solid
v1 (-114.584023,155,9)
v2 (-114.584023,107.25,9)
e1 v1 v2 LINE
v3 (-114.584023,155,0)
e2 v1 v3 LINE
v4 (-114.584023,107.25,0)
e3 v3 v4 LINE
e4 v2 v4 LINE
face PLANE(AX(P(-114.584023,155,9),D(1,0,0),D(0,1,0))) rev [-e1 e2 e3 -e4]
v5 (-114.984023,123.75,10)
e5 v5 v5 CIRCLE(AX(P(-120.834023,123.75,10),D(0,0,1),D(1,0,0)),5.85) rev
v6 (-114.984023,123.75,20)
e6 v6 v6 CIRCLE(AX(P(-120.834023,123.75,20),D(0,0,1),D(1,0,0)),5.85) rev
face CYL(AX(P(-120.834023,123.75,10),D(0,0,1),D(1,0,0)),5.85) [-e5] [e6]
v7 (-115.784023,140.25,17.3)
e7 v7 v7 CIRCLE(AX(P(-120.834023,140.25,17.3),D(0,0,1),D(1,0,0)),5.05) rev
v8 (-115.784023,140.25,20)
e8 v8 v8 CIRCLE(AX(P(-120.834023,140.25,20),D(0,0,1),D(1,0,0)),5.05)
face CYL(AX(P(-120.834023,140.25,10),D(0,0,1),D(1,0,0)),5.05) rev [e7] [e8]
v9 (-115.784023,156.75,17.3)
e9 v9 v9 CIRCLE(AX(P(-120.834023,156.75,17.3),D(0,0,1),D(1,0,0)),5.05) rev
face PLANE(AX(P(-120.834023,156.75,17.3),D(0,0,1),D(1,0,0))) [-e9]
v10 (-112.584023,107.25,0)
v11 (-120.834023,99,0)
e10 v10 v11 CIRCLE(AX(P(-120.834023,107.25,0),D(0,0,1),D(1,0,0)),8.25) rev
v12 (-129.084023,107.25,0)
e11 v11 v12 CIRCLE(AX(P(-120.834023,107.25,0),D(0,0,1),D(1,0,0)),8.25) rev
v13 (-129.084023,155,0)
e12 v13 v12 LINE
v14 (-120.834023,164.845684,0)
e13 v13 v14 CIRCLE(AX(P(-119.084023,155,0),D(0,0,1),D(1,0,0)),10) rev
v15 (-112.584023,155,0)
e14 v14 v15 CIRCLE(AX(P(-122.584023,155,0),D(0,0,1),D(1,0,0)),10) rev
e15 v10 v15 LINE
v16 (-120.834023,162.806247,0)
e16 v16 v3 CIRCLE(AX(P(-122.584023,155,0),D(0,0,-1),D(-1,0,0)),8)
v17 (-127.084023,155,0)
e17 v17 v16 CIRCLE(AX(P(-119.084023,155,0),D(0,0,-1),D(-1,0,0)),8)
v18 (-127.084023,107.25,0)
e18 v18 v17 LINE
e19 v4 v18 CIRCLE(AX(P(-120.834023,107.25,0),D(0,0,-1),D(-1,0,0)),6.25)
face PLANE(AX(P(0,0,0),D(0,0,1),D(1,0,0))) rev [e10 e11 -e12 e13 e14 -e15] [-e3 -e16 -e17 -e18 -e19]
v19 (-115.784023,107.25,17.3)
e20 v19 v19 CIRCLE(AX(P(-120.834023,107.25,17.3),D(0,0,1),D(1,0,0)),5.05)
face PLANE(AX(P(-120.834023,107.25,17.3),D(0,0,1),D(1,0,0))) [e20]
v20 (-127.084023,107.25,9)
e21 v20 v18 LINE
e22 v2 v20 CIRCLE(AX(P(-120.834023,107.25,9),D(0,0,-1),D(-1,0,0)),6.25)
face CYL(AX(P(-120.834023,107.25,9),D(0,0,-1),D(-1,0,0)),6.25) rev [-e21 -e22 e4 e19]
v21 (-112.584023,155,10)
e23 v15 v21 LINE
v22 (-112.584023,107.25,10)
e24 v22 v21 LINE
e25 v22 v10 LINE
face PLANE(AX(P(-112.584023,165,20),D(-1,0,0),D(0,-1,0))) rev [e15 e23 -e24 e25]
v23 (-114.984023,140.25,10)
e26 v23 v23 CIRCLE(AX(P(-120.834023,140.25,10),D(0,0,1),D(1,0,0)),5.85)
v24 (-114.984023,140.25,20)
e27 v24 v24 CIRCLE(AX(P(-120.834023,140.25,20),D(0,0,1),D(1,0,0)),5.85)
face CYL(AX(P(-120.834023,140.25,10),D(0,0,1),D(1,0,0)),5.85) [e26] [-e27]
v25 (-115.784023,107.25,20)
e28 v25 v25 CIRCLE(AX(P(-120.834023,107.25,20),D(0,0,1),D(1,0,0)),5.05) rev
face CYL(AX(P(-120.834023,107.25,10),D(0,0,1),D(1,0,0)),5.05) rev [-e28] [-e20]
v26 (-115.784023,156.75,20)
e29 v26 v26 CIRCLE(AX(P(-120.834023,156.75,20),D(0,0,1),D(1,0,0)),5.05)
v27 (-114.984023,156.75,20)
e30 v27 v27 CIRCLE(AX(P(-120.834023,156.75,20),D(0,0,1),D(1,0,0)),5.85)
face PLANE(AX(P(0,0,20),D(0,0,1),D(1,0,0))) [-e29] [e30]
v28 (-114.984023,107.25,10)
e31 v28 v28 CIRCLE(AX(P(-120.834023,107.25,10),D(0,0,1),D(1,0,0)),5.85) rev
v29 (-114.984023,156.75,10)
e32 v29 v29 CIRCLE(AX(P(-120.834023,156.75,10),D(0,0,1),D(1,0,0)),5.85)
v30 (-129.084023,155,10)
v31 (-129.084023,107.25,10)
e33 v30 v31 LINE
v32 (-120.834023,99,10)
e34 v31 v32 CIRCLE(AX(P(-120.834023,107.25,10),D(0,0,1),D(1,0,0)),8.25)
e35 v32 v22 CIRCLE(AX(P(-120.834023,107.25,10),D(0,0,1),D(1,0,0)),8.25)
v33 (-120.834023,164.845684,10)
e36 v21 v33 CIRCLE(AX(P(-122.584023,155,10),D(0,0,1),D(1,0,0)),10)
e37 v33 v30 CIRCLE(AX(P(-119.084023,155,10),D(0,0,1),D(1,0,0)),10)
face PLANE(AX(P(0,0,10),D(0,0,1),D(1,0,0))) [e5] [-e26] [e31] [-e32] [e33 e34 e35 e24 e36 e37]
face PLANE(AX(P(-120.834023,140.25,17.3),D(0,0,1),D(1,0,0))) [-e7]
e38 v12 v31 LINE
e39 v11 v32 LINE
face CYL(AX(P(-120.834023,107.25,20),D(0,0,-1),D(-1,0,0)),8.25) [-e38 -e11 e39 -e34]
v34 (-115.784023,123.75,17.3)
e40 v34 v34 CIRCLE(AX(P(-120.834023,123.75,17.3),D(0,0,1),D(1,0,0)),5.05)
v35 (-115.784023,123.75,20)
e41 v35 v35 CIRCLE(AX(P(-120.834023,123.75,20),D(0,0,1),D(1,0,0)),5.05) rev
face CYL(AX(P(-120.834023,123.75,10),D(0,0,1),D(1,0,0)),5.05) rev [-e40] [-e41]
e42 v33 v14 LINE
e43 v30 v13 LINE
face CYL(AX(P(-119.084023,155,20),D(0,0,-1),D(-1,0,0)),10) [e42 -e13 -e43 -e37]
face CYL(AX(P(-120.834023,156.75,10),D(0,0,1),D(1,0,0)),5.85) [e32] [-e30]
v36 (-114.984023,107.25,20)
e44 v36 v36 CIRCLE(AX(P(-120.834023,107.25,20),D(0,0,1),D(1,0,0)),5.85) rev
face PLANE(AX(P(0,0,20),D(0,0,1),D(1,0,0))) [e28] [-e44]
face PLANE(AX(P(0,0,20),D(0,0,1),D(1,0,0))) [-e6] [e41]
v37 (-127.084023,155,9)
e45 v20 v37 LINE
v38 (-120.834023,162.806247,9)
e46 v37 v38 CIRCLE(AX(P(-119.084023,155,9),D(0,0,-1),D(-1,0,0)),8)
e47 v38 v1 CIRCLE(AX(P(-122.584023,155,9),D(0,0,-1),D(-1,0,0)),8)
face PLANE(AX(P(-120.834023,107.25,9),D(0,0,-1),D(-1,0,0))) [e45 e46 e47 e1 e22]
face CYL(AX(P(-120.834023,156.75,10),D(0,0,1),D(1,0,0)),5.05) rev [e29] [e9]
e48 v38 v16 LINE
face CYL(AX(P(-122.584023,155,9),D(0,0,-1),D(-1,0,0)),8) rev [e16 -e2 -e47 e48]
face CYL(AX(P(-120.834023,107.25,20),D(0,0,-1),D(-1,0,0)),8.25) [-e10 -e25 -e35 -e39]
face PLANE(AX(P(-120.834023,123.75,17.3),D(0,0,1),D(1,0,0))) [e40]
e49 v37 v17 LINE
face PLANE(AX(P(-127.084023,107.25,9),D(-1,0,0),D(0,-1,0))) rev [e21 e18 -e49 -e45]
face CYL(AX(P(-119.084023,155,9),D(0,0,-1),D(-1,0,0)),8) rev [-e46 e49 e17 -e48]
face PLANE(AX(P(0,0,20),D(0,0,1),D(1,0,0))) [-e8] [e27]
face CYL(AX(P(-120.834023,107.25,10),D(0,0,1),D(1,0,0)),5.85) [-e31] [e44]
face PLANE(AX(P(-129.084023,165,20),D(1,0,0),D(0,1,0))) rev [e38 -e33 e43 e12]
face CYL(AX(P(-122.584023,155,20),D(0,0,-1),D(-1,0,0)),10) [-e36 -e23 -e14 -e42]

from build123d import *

# Parameters (mm, degrees)
SKETCH1_W                       = 16.5
SKETCH1_H                       = 66
BOSS_EXTRUDE1_DEPTH             = 20
SKETCH2_W                       = 16.5
SKETCH2_H                       = 33
SKETCH2_R                       = 5.85
SKETCH2_R_2                     = 5.05
CUT_EXTRUDE1_DEPTH              = 10
FILLET1_R                       = 10
FILLET2_R                       = 8.25
SKIZZE1_R                       = 5.1
AUFSATZ_LINEAR_AUSTRAGEN1_DEPTH = 7.3
SCHNITT_LINEAR_AUSTRAGEN1_DEPTH = 9


# Some blends are built 0.0001 mm under size
with BuildPart() as part:
    # Sketch1 → Boss-Extrude1 (new body)
    with BuildSketch(Plane.XY):
        with Locations((-120.834022786, 132)):
            Rectangle(SKETCH1_W, SKETCH1_H)
    extrude(amount=BOSS_EXTRUDE1_DEPTH)

    # Sketch2 → Cut-Extrude1 (cut)
    # profile 1 of 6: a face of its own
    with BuildSketch(Plane.XY.offset(20)):
        with Locations((-120.834022786, 115.5)):
            Rectangle(SKETCH2_W, SKETCH2_H)
        with Locations((-120.834022786, 107.25)):
            Circle(SKETCH2_R, mode=Mode.SUBTRACT)
        with Locations((-120.834022786, 123.75)):
            Circle(SKETCH2_R, mode=Mode.SUBTRACT)
    # profile 2 of 6: a face of its own
    with BuildSketch(Plane.XY.offset(20)):
        with Locations((-120.834022786, 148.5)):
            Rectangle(SKETCH2_W, SKETCH2_H)
        with Locations((-120.834022786, 140.25)):
            Circle(SKETCH2_R, mode=Mode.SUBTRACT)
        with Locations((-120.834022786, 156.75)):
            Circle(SKETCH2_R, mode=Mode.SUBTRACT)
    # profile 3 of 6: a face of its own
    with BuildSketch(Plane.XY.offset(20)):
        with Locations((-120.834022786, 140.25)):
            Circle(SKETCH2_R_2)
    # profile 4 of 6: a face of its own
    with BuildSketch(Plane.XY.offset(20)):
        with Locations((-120.834022786, 123.75)):
            Circle(SKETCH2_R_2)
    # profile 5 of 6: a face of its own
    with BuildSketch(Plane.XY.offset(20)):
        with Locations((-120.834022786, 107.25)):
            Circle(SKETCH2_R_2)
    # profile 6 of 6: a face of its own
    with BuildSketch(Plane.XY.offset(20)):
        with Locations((-120.834022786, 156.75)):
            Circle(SKETCH2_R_2)
    extrude(amount=-CUT_EXTRUDE1_DEPTH, mode=Mode.SUBTRACT)

    # Fillet1
    # the kernel refuses this fillet: 10 mm, written as the material it takes off along each edge
    with BuildSketch(Plane(origin=(-129.084022786, 165, -25), x_dir=(1, 0, 0), z_dir=(0, 0, 1))) as fillet1_piece_1:
        with BuildLine():
            CenterArc((FILLET1_R, -FILLET1_R), FILLET1_R, 90, 90)
            Line((0, -FILLET1_R), (0, 0))
            Line((0, 0), (FILLET1_R, 0))
        make_face()
    extrude(amount=60, mode=Mode.SUBTRACT)
    with BuildSketch(Plane(origin=(-112.584022786, 165, -25), x_dir=(-1, 0, 0), z_dir=(0, 0, 1))) as fillet1_piece_2:
        with BuildLine():
            CenterArc((FILLET1_R, FILLET1_R), FILLET1_R, 180, 90)
            Line((0, FILLET1_R), (0, 0))
            Line((0, 0), (FILLET1_R, 0))
        make_face()
    extrude(amount=60, mode=Mode.SUBTRACT)

    # Fillet2
    fillet2_edges = [part.edges().sort_by_distance(p)[0] for p in [
        (-129.084022786, 99, 5),
        (-112.584022786, 99, 5),
    ]]
    fillet(fillet2_edges, radius=FILLET2_R - 0.0001)  # a hair under: the kernel refuses the full size

    # Skizze1 → Aufsatz-Linear austragen1 (add)
    with BuildSketch(Plane.XY.offset(10)):
        with Locations((-120.834022786, 156.75)):
            Circle(SKIZZE1_R)
        with Locations((-120.834022786, 140.25)):
            Circle(SKIZZE1_R)
        with Locations((-120.834022786, 123.75)):
            Circle(SKIZZE1_R)
        with Locations((-120.834022786, 107.25)):
            Circle(SKIZZE1_R)
    extrude(amount=AUFSATZ_LINEAR_AUSTRAGEN1_DEPTH)

    # Skizze2 → Schnitt-Linear austragen1 (cut)
    with BuildSketch(Plane(origin=(0, 0, 0), x_dir=(-1, 0, 0), z_dir=(0, 0, -1))):
        with BuildLine():
            Line((127.084022786, 107.25), (127.084022786, 155))
            ThreePointArc((127.084022786, 155), (125.329020784, 160), (120.834022786, 162.806247498))
            ThreePointArc((120.834022786, 162.806247498), (116.339024787, 160), (114.584022786, 155))
            Line((114.584022786, 155), (114.584022786, 107.25))
            ThreePointArc((114.584022786, 107.25), (116.414605403, 102.830582618), (120.834022786, 101))
            ThreePointArc((120.834022786, 101), (125.253440168, 102.830582618), (127.084022786, 107.25))
        make_face()
    extrude(amount=-SCHNITT_LINEAR_AUSTRAGEN1_DEPTH, mode=Mode.SUBTRACT)


solid = part.part
